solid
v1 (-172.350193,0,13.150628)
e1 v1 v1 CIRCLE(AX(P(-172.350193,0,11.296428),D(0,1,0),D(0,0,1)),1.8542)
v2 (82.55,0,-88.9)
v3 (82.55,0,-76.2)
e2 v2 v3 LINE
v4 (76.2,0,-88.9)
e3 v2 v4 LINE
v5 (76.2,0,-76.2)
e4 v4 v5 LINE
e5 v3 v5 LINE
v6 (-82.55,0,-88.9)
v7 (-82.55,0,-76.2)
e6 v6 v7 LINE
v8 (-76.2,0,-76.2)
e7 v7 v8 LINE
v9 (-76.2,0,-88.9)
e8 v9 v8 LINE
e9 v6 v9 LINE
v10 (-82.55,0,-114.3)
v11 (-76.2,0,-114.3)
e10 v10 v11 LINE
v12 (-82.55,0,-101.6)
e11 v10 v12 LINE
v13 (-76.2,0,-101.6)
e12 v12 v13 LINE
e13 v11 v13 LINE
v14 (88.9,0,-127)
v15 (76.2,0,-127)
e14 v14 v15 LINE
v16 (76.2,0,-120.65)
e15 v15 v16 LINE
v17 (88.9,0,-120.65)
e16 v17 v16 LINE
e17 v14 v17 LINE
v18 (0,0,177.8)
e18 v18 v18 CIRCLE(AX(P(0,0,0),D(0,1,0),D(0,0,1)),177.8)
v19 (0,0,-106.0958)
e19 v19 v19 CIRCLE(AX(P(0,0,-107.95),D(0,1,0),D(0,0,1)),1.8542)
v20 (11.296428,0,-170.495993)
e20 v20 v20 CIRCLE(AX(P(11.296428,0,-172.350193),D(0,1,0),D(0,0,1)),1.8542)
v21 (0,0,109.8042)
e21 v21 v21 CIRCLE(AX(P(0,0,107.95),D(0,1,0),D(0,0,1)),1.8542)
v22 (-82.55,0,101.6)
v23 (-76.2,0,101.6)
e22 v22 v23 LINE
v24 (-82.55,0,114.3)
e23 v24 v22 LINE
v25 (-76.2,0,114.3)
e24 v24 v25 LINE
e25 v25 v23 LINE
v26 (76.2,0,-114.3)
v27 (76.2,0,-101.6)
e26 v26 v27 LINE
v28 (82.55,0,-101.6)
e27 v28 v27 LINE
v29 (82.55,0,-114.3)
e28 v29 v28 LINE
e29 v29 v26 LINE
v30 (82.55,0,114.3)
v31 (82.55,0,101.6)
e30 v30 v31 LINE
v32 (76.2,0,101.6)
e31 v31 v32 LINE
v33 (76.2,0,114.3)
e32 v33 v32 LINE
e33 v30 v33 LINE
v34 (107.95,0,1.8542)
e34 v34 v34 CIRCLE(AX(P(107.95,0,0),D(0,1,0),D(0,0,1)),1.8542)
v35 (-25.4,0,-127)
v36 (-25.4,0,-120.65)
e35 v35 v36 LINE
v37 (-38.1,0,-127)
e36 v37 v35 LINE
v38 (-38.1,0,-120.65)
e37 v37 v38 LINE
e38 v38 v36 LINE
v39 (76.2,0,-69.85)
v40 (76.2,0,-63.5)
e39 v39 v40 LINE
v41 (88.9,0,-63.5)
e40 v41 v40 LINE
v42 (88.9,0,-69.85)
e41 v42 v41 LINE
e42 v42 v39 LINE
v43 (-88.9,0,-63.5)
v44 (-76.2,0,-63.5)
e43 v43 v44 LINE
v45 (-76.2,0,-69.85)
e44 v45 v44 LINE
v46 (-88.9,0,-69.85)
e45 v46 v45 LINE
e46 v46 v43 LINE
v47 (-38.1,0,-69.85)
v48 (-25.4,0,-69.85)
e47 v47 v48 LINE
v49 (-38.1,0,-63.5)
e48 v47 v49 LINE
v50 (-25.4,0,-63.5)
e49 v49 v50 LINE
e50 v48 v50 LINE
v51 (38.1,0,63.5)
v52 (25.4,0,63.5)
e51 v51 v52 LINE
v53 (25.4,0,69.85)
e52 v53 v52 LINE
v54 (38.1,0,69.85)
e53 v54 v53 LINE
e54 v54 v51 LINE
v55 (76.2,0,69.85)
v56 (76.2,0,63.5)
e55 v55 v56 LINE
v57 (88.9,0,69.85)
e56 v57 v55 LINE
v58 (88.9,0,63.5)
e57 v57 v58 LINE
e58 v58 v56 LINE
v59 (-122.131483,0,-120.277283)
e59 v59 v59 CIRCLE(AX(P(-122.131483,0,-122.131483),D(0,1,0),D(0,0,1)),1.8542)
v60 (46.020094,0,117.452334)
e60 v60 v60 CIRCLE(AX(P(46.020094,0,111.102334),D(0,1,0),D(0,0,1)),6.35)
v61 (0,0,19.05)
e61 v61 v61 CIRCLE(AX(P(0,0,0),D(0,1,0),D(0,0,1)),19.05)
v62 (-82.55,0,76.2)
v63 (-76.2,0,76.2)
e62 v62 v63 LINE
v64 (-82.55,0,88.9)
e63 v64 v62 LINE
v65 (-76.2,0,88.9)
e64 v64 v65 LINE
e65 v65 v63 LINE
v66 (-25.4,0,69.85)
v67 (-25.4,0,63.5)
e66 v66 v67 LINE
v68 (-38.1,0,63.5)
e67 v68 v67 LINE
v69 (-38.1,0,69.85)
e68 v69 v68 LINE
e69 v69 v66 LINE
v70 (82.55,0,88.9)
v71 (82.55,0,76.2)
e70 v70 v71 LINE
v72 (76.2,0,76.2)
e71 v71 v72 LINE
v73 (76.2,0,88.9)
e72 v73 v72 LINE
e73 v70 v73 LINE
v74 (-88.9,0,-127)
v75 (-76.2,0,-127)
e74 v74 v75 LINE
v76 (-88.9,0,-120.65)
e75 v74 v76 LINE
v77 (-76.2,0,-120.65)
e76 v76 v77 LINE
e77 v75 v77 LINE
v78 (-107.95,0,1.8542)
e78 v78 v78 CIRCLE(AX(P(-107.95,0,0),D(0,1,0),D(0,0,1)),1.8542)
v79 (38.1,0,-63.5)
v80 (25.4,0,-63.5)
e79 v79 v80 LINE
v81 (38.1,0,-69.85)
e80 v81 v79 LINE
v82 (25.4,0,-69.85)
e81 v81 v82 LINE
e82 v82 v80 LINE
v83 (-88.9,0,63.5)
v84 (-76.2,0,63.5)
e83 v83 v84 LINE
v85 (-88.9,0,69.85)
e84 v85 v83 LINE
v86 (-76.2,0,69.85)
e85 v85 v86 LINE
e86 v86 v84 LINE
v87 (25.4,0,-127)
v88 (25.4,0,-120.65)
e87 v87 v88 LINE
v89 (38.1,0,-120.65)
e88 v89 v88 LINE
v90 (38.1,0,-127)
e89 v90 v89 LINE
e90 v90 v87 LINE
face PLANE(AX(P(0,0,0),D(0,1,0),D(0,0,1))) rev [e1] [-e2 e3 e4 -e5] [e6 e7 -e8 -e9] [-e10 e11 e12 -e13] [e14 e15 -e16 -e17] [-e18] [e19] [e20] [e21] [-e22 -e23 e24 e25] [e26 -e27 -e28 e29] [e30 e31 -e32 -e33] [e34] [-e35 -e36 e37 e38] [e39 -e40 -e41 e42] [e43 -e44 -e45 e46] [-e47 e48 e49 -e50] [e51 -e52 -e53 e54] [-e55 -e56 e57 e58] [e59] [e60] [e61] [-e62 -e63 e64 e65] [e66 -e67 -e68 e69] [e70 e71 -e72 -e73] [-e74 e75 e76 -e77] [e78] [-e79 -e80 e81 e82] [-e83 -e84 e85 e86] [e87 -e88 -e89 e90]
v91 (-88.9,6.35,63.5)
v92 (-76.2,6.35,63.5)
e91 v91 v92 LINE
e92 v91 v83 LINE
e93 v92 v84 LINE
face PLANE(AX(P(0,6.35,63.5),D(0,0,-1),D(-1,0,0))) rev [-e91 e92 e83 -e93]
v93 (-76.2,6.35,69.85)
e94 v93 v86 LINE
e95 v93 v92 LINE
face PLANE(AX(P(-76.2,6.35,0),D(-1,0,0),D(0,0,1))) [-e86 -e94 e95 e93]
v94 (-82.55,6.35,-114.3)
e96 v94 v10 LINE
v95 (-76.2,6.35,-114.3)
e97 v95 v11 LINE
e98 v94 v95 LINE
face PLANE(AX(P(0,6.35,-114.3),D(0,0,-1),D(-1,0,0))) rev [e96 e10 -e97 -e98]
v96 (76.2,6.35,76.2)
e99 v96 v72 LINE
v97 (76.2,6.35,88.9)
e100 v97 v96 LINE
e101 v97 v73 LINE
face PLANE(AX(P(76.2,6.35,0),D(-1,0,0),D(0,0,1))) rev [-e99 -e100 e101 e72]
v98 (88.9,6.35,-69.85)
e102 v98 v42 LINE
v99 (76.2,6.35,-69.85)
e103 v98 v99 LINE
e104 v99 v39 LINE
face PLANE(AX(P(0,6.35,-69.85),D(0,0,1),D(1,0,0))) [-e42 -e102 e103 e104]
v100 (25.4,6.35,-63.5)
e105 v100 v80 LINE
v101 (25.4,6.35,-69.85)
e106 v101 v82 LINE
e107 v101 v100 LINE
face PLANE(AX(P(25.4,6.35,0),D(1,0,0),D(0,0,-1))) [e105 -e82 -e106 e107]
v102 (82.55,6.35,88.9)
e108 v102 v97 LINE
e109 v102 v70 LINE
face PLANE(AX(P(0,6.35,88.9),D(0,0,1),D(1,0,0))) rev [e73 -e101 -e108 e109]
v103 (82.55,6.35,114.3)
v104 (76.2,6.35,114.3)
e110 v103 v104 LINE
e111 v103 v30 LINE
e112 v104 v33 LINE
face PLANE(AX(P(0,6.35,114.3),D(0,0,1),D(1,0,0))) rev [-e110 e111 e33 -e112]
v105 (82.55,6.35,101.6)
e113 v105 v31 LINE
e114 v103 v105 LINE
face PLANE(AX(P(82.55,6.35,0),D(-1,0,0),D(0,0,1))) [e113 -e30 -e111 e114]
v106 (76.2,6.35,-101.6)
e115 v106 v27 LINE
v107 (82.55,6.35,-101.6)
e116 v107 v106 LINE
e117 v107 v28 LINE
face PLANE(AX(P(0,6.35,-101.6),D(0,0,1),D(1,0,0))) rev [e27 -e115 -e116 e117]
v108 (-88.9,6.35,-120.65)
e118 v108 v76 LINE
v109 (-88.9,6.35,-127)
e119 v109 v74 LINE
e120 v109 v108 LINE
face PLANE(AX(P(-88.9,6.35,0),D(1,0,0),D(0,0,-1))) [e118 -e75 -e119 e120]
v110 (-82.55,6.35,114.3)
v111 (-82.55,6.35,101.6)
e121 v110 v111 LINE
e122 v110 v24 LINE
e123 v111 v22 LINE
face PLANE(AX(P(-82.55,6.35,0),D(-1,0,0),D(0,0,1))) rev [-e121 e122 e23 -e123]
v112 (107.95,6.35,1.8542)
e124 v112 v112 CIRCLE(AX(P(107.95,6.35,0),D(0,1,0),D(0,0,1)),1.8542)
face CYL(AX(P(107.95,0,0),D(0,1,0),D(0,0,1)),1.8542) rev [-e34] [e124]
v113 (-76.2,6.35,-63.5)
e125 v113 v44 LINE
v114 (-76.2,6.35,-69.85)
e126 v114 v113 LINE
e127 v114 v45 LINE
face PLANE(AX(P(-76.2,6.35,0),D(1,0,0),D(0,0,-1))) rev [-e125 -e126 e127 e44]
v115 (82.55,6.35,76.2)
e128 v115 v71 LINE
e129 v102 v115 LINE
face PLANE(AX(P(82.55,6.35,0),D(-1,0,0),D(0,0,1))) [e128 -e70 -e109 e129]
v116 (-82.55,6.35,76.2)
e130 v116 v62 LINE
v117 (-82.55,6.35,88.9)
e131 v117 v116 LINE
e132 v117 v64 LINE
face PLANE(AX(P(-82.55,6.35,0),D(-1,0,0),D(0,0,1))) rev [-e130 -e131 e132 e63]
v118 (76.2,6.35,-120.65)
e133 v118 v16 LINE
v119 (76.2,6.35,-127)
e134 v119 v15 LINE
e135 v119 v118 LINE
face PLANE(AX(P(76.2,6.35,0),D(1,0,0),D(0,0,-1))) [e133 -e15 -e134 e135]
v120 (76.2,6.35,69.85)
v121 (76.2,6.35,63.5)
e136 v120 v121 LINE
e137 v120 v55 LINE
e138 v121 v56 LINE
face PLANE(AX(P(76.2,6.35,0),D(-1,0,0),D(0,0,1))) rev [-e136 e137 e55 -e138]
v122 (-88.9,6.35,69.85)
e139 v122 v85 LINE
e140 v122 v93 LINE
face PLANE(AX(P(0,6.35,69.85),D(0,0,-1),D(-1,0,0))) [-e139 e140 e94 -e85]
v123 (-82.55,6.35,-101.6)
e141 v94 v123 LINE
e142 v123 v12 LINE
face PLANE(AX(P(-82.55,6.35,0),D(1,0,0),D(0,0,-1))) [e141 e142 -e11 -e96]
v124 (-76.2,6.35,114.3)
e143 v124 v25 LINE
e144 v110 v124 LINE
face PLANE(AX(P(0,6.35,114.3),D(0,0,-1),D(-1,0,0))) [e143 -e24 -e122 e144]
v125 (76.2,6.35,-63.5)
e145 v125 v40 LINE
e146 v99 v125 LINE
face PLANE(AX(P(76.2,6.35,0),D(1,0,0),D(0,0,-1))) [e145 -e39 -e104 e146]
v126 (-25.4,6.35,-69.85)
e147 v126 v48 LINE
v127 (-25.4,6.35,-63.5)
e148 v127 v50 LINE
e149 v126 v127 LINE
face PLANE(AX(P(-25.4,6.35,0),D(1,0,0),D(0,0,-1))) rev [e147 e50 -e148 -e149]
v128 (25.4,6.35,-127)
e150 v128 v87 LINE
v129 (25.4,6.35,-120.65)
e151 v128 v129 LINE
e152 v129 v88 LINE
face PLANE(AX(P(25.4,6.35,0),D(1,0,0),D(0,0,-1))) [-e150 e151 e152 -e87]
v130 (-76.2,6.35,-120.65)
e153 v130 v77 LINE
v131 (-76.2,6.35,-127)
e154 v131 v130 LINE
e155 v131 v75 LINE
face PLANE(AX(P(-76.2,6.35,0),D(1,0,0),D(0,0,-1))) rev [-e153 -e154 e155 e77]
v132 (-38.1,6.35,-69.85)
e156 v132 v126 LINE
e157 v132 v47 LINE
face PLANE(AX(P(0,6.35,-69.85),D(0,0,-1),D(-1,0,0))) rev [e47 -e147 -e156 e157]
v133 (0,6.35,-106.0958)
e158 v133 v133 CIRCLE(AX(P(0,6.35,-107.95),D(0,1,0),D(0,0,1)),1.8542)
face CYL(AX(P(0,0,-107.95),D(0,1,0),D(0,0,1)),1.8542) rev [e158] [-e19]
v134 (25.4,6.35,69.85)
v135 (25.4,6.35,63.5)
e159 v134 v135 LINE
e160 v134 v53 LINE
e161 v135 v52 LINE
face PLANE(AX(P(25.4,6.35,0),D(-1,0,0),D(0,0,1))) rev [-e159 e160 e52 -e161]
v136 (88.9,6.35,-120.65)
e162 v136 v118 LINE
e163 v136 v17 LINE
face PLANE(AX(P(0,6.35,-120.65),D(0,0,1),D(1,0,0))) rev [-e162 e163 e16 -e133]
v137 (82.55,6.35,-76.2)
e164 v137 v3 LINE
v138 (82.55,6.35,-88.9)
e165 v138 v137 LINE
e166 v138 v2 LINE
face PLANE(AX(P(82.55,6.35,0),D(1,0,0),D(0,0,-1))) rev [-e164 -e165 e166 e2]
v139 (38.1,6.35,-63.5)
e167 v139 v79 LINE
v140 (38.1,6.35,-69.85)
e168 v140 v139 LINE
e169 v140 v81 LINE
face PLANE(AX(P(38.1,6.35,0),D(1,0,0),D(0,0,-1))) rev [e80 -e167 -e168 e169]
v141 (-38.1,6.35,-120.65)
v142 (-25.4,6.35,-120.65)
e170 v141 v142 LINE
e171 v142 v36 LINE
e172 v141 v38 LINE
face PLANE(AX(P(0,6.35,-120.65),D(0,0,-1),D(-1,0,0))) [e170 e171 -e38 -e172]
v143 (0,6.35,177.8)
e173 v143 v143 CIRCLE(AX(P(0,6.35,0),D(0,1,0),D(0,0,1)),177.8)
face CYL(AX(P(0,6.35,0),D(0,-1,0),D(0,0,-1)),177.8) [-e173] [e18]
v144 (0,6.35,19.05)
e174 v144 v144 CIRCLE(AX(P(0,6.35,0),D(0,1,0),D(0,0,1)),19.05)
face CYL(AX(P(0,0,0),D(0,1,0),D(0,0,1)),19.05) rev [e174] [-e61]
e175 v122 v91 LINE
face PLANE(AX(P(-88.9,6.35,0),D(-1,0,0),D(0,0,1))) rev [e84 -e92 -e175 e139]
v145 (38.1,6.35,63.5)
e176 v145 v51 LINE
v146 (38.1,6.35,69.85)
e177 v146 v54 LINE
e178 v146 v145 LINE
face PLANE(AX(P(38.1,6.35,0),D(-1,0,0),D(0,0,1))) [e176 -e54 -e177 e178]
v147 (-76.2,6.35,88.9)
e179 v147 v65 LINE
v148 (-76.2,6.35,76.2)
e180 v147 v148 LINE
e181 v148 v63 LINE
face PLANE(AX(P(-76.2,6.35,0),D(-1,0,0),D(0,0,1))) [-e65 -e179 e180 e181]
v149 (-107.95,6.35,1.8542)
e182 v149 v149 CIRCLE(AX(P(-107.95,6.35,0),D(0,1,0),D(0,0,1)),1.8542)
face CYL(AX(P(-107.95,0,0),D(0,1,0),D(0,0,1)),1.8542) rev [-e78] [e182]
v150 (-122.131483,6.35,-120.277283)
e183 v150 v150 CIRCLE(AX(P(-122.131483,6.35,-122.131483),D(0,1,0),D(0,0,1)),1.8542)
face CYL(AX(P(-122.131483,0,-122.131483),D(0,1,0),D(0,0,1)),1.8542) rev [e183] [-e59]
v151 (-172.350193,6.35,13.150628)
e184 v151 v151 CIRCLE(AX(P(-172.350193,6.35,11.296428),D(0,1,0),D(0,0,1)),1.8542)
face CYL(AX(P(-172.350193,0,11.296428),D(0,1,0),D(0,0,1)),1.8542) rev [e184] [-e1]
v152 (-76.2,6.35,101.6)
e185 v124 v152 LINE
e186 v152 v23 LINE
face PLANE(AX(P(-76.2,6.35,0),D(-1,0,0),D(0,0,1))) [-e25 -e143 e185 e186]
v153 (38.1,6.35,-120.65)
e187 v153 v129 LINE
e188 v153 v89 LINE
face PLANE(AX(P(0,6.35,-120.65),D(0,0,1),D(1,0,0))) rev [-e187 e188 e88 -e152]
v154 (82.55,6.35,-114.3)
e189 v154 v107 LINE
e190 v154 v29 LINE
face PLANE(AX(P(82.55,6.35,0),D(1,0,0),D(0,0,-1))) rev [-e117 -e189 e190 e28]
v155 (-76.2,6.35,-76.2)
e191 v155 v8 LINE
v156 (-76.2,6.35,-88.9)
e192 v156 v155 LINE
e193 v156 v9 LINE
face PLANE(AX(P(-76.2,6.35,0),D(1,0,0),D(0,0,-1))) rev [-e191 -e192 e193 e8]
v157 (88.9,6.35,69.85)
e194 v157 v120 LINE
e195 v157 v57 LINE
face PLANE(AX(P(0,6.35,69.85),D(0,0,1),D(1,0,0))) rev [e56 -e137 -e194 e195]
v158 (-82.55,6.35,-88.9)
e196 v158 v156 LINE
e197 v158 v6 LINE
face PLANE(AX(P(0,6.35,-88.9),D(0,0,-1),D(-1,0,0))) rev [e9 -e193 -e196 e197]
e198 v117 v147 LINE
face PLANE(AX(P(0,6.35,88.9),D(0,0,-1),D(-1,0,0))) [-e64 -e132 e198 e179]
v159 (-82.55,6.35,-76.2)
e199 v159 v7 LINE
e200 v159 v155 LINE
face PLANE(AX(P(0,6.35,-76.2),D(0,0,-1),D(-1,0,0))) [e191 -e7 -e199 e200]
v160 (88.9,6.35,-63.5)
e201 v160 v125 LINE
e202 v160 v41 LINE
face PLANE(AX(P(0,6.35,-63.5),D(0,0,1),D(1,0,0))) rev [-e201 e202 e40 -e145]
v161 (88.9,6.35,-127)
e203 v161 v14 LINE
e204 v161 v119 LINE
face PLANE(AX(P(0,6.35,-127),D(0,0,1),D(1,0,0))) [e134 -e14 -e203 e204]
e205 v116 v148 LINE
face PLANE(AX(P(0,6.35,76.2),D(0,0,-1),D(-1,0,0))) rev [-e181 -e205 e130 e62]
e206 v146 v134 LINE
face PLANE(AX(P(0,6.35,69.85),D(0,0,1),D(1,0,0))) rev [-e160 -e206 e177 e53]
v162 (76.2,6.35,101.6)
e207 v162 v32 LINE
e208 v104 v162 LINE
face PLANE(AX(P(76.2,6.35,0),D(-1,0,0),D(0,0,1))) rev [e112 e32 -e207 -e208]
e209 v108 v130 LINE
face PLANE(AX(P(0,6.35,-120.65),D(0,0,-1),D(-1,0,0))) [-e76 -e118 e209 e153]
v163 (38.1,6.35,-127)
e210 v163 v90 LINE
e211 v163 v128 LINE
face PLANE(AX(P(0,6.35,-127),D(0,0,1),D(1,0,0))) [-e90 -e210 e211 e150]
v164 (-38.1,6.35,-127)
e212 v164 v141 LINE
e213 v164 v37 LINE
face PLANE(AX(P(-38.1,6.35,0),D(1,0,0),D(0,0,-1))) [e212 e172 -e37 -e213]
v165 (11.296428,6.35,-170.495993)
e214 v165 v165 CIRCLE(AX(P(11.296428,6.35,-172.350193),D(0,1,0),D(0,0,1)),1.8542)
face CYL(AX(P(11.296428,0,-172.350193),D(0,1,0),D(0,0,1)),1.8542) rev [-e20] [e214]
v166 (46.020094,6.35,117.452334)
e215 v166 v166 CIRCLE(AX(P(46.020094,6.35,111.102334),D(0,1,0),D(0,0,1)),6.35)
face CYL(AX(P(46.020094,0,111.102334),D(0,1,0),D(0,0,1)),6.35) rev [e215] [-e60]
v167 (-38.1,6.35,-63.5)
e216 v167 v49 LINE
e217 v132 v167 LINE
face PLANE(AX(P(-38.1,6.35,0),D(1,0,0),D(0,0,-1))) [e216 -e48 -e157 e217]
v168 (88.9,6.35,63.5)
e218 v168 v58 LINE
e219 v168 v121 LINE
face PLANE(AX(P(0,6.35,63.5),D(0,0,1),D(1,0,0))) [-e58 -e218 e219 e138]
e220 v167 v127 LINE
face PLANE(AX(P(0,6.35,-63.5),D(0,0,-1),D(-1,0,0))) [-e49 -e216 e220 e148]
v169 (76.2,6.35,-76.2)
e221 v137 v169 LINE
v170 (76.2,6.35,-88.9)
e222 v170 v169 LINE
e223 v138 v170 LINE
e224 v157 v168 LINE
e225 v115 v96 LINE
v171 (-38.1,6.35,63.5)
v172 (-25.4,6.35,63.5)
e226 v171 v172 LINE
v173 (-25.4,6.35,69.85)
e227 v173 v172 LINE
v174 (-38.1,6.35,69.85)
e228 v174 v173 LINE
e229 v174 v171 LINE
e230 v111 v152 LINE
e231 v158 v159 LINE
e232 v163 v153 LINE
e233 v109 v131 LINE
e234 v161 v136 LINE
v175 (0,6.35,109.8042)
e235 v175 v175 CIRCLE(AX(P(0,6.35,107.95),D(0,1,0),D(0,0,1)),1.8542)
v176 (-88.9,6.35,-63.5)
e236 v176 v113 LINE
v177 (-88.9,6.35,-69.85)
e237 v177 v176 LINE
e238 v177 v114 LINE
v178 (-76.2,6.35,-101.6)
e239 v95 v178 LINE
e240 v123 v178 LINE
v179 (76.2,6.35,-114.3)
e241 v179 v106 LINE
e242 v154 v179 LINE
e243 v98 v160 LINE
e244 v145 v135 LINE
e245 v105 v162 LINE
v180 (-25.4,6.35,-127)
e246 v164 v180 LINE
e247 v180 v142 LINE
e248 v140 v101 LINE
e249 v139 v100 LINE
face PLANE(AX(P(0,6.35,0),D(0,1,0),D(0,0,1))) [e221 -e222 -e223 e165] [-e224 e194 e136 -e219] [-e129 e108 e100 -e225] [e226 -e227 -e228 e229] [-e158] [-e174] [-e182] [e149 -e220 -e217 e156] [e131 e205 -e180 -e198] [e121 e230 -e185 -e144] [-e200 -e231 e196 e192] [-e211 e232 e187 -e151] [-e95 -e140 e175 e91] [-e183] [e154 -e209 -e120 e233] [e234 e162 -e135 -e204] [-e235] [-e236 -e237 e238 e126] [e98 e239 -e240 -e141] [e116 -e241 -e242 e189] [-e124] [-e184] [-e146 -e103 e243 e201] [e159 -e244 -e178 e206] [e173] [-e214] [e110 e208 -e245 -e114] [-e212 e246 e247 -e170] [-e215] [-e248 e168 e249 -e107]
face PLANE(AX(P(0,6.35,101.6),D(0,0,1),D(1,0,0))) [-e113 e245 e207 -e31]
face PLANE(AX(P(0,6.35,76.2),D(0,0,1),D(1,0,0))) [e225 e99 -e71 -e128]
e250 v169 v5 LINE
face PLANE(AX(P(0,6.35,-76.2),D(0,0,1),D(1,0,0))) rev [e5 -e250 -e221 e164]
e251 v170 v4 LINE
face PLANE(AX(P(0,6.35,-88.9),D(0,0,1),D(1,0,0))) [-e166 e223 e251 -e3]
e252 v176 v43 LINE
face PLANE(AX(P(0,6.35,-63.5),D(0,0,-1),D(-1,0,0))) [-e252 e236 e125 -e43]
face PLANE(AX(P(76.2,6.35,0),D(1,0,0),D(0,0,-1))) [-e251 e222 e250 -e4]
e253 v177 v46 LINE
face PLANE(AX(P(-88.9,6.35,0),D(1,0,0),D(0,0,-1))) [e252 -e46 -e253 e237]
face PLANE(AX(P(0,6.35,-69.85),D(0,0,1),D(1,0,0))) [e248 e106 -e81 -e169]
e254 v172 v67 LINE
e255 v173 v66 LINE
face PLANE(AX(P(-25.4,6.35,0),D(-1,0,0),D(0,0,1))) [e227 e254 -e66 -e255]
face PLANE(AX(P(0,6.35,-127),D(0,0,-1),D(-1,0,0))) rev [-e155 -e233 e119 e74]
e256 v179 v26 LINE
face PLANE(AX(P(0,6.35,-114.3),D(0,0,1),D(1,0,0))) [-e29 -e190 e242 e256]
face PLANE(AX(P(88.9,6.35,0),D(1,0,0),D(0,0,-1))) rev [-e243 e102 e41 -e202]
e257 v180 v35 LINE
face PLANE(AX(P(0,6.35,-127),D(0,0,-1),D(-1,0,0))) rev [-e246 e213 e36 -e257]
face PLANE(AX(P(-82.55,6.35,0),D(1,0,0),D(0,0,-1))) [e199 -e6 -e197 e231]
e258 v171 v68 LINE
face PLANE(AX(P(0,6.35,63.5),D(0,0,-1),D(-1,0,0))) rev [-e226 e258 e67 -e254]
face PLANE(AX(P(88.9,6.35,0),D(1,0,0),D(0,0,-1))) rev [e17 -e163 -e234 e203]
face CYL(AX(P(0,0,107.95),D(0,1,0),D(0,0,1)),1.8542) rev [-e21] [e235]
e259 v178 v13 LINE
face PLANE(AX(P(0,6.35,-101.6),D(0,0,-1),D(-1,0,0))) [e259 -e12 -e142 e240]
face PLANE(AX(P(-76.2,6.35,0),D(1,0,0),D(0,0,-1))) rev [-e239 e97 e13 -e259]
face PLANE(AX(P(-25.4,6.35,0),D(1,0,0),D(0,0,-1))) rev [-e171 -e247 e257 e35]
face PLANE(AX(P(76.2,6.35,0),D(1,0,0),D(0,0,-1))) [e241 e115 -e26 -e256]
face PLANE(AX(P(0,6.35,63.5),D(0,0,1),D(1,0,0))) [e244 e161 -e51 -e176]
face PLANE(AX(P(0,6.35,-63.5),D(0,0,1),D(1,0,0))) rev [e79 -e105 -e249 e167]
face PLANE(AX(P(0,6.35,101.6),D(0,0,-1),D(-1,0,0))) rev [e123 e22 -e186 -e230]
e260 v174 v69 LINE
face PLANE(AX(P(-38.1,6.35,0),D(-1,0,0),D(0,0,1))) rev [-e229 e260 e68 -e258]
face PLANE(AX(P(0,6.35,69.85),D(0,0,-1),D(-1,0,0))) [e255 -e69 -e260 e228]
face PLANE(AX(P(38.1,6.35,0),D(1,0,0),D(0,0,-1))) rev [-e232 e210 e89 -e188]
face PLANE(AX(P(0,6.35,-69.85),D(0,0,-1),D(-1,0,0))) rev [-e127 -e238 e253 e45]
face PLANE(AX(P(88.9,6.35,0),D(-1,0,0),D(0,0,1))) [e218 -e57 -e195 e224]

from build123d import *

# Parameters (mm, degrees)
MAIN_DISC_OUTLINE_R   = 177.8
MAIN_DISC_OUTLINE_W   = 6.35
MAIN_DISC_OUTLINE_H   = 12.7
MAIN_DISC_OUTLINE_W_2 = 12.7
MAIN_DISC_OUTLINE_H_2 = 6.35
MAIN_DISC_DEPTH       = 6.35
SKETCH2_R             = 19.05
SKETCH2_R_2           = 1.8542
SKETCH2_R_3           = 6.35
BEARING_HOLES_DEPTH   = 252.527339468
RACK_HOLES_DEPTH      = 252.527339468


# Read off the part's stored shape, not the designer's step: Main Disc
with BuildPart() as part:
    # Main Disc outline → Main Disc (new body)
    with BuildSketch(Plane(origin=(0, 0, 0), x_dir=(1, 0, 0), z_dir=(0, 1, 0))):
        Circle(MAIN_DISC_OUTLINE_R)
        with Locations((-79.375, -107.95)):
            Rectangle(MAIN_DISC_OUTLINE_W, MAIN_DISC_OUTLINE_H, mode=Mode.SUBTRACT)
        with Locations((-79.375, -82.55)):
            Rectangle(MAIN_DISC_OUTLINE_W, MAIN_DISC_OUTLINE_H, mode=Mode.SUBTRACT)
        with Locations((-82.55, -66.675)):
            Rectangle(MAIN_DISC_OUTLINE_W_2, MAIN_DISC_OUTLINE_H_2, mode=Mode.SUBTRACT)
        with Locations((-31.75, -66.675)):
            Rectangle(MAIN_DISC_OUTLINE_W_2, MAIN_DISC_OUTLINE_H_2, mode=Mode.SUBTRACT)
        with Locations((79.375, -107.95)):
            Rectangle(MAIN_DISC_OUTLINE_W, MAIN_DISC_OUTLINE_H, mode=Mode.SUBTRACT)
        with Locations((31.75, -66.675)):
            Rectangle(MAIN_DISC_OUTLINE_W_2, MAIN_DISC_OUTLINE_H_2, mode=Mode.SUBTRACT)
        with Locations((79.375, -82.55)):
            Rectangle(MAIN_DISC_OUTLINE_W, MAIN_DISC_OUTLINE_H, mode=Mode.SUBTRACT)
        with Locations((82.55, -66.675)):
            Rectangle(MAIN_DISC_OUTLINE_W_2, MAIN_DISC_OUTLINE_H_2, mode=Mode.SUBTRACT)
        with Locations((-82.55, 66.675)):
            Rectangle(MAIN_DISC_OUTLINE_W_2, MAIN_DISC_OUTLINE_H_2, mode=Mode.SUBTRACT)
        with Locations((-79.375, 82.55)):
            Rectangle(MAIN_DISC_OUTLINE_W, MAIN_DISC_OUTLINE_H, mode=Mode.SUBTRACT)
        with Locations((-31.75, 66.675)):
            Rectangle(MAIN_DISC_OUTLINE_W_2, MAIN_DISC_OUTLINE_H_2, mode=Mode.SUBTRACT)
        with Locations((-79.375, 107.95)):
            Rectangle(MAIN_DISC_OUTLINE_W, MAIN_DISC_OUTLINE_H, mode=Mode.SUBTRACT)
        with Locations((-82.55, 123.825)):
            Rectangle(MAIN_DISC_OUTLINE_W_2, MAIN_DISC_OUTLINE_H_2, mode=Mode.SUBTRACT)
        with Locations((-31.75, 123.825)):
            Rectangle(MAIN_DISC_OUTLINE_W_2, MAIN_DISC_OUTLINE_H_2, mode=Mode.SUBTRACT)
        with Locations((31.75, 66.675)):
            Rectangle(MAIN_DISC_OUTLINE_W_2, MAIN_DISC_OUTLINE_H_2, mode=Mode.SUBTRACT)
        with Locations((82.55, 66.675)):
            Rectangle(MAIN_DISC_OUTLINE_W_2, MAIN_DISC_OUTLINE_H_2, mode=Mode.SUBTRACT)
        with Locations((79.375, 82.55)):
            Rectangle(MAIN_DISC_OUTLINE_W, MAIN_DISC_OUTLINE_H, mode=Mode.SUBTRACT)
        with Locations((31.75, 123.825)):
            Rectangle(MAIN_DISC_OUTLINE_W_2, MAIN_DISC_OUTLINE_H_2, mode=Mode.SUBTRACT)
        with Locations((79.375, 107.95)):
            Rectangle(MAIN_DISC_OUTLINE_W, MAIN_DISC_OUTLINE_H, mode=Mode.SUBTRACT)
        with Locations((82.55, 123.825)):
            Rectangle(MAIN_DISC_OUTLINE_W_2, MAIN_DISC_OUTLINE_H_2, mode=Mode.SUBTRACT)
    extrude(amount=MAIN_DISC_DEPTH)

    # Sketch2 → Bearing Holes (cut, through all)
    with BuildSketch(Plane(origin=(0, 6.35, 0), x_dir=(1, 0, 0), z_dir=(0, 1, 0))):
        with Locations(Location((0, 0, 0), (0, 0, 270))):
            Circle(SKETCH2_R)
        with Locations(Location((0, -107.95, 0), (0, 0, 270))):
            Circle(SKETCH2_R_2)
        with Locations(Location((46.020093648, -111.102334226, 0), (0, 0, 270))):
            Circle(SKETCH2_R_3)
        with Locations(Location((107.95, 0, 0), (0, 0, 270))):
            Circle(SKETCH2_R_2)
        with Locations(Location((0, 107.95, 0), (0, 0, 270))):
            Circle(SKETCH2_R_2)
        with Locations(Location((-107.95, 0, 0), (0, 0, 270))):
            Circle(SKETCH2_R_2)
    extrude(amount=-BEARING_HOLES_DEPTH, mode=Mode.SUBTRACT)

    # Sketch3 → Rack Holes (cut, through all)
    with BuildSketch(Plane(origin=(0, 6.35, 0), x_dir=(1, 0, 0), z_dir=(0, 1, 0))):
        with BuildLine():
            ThreePointArc((-170.495993222, -11.296428481), (-170.496985984, -11.235760757), (-170.499963206, -11.175157998))
            Line((-170.499963206, -11.175157998), (-172.350193222, -11.296428481))
            ThreePointArc((-172.350193222, -11.296428481), (-172.4083456, -10.371150737), (-172.461530575, -9.445574182))
            ThreePointArc((-172.461530575, -9.445574182), (-173.621337572, -12.646335766), (-170.495993222, -11.296428481))
        make_face()
        with BuildLine():
            Line((-172.350193222, -11.296428481), (-170.499963206, -11.175157998))
            ThreePointArc((-170.499963206, -11.175157998), (-171.123897186, -9.905653275), (-172.461530575, -9.445574182))
            ThreePointArc((-172.461530575, -9.445574182), (-172.4083456, -10.371150737), (-172.350193222, -11.296428481))
        make_face()
        with BuildLine():
            ThreePointArc((-123.435544137, 120.813347125), (-122.126506883, 120.277289924), (-120.820365853, 120.820365853))
            Line((-120.820365853, 120.820365853), (-122.131483247, 122.131483247))
            ThreePointArc((-122.131483247, 122.131483247), (-122.785282527, 121.474165133), (-123.435544137, 120.813347125))
        make_face()
        with BuildLine():
            Line((-122.131483247, 122.131483247), (-120.820365853, 120.820365853))
            ThreePointArc((-120.820365853, 120.820365853), (-120.418425817, 121.421911626), (-120.277283247, 122.131483247))
            ThreePointArc((-120.277283247, 122.131483247), (-120.416527615, 122.836454751), (-120.813347125, 123.435544137))
            ThreePointArc((-120.813347125, 123.435544137), (-121.474165133, 122.785282527), (-122.131483247, 122.131483247))
        make_face()
        with BuildLine():
            ThreePointArc((-120.813347125, 123.435544137), (-123.44260064, 123.44260064), (-123.435544137, 120.813347125))
            ThreePointArc((-123.435544137, 120.813347125), (-122.785282527, 121.474165133), (-122.131483247, 122.131483247))
            ThreePointArc((-122.131483247, 122.131483247), (-121.474165133, 122.785282527), (-120.813347125, 123.435544137))
        make_face()
        with BuildLine():
            ThreePointArc((9.445574182, 172.461530575), (9.905653275, 171.123897186), (11.175157998, 170.499963206))
            Line((11.175157998, 170.499963206), (11.296428481, 172.350193222))
            ThreePointArc((11.296428481, 172.350193222), (10.371150737, 172.4083456), (9.445574182, 172.461530575))
        make_face()
        with BuildLine():
            Line((11.296428481, 172.350193222), (11.175157998, 170.499963206))
            ThreePointArc((11.175157998, 170.499963206), (12.563945327, 170.996879258), (13.150628481, 172.350193222))
            ThreePointArc((13.150628481, 172.350193222), (11.352122286, 174.203556608), (9.445574182, 172.461530575))
            ThreePointArc((9.445574182, 172.461530575), (10.371150737, 172.4083456), (11.296428481, 172.350193222))
        make_face()
    extrude(amount=-RACK_HOLES_DEPTH, mode=Mode.SUBTRACT)


solid = part.part
